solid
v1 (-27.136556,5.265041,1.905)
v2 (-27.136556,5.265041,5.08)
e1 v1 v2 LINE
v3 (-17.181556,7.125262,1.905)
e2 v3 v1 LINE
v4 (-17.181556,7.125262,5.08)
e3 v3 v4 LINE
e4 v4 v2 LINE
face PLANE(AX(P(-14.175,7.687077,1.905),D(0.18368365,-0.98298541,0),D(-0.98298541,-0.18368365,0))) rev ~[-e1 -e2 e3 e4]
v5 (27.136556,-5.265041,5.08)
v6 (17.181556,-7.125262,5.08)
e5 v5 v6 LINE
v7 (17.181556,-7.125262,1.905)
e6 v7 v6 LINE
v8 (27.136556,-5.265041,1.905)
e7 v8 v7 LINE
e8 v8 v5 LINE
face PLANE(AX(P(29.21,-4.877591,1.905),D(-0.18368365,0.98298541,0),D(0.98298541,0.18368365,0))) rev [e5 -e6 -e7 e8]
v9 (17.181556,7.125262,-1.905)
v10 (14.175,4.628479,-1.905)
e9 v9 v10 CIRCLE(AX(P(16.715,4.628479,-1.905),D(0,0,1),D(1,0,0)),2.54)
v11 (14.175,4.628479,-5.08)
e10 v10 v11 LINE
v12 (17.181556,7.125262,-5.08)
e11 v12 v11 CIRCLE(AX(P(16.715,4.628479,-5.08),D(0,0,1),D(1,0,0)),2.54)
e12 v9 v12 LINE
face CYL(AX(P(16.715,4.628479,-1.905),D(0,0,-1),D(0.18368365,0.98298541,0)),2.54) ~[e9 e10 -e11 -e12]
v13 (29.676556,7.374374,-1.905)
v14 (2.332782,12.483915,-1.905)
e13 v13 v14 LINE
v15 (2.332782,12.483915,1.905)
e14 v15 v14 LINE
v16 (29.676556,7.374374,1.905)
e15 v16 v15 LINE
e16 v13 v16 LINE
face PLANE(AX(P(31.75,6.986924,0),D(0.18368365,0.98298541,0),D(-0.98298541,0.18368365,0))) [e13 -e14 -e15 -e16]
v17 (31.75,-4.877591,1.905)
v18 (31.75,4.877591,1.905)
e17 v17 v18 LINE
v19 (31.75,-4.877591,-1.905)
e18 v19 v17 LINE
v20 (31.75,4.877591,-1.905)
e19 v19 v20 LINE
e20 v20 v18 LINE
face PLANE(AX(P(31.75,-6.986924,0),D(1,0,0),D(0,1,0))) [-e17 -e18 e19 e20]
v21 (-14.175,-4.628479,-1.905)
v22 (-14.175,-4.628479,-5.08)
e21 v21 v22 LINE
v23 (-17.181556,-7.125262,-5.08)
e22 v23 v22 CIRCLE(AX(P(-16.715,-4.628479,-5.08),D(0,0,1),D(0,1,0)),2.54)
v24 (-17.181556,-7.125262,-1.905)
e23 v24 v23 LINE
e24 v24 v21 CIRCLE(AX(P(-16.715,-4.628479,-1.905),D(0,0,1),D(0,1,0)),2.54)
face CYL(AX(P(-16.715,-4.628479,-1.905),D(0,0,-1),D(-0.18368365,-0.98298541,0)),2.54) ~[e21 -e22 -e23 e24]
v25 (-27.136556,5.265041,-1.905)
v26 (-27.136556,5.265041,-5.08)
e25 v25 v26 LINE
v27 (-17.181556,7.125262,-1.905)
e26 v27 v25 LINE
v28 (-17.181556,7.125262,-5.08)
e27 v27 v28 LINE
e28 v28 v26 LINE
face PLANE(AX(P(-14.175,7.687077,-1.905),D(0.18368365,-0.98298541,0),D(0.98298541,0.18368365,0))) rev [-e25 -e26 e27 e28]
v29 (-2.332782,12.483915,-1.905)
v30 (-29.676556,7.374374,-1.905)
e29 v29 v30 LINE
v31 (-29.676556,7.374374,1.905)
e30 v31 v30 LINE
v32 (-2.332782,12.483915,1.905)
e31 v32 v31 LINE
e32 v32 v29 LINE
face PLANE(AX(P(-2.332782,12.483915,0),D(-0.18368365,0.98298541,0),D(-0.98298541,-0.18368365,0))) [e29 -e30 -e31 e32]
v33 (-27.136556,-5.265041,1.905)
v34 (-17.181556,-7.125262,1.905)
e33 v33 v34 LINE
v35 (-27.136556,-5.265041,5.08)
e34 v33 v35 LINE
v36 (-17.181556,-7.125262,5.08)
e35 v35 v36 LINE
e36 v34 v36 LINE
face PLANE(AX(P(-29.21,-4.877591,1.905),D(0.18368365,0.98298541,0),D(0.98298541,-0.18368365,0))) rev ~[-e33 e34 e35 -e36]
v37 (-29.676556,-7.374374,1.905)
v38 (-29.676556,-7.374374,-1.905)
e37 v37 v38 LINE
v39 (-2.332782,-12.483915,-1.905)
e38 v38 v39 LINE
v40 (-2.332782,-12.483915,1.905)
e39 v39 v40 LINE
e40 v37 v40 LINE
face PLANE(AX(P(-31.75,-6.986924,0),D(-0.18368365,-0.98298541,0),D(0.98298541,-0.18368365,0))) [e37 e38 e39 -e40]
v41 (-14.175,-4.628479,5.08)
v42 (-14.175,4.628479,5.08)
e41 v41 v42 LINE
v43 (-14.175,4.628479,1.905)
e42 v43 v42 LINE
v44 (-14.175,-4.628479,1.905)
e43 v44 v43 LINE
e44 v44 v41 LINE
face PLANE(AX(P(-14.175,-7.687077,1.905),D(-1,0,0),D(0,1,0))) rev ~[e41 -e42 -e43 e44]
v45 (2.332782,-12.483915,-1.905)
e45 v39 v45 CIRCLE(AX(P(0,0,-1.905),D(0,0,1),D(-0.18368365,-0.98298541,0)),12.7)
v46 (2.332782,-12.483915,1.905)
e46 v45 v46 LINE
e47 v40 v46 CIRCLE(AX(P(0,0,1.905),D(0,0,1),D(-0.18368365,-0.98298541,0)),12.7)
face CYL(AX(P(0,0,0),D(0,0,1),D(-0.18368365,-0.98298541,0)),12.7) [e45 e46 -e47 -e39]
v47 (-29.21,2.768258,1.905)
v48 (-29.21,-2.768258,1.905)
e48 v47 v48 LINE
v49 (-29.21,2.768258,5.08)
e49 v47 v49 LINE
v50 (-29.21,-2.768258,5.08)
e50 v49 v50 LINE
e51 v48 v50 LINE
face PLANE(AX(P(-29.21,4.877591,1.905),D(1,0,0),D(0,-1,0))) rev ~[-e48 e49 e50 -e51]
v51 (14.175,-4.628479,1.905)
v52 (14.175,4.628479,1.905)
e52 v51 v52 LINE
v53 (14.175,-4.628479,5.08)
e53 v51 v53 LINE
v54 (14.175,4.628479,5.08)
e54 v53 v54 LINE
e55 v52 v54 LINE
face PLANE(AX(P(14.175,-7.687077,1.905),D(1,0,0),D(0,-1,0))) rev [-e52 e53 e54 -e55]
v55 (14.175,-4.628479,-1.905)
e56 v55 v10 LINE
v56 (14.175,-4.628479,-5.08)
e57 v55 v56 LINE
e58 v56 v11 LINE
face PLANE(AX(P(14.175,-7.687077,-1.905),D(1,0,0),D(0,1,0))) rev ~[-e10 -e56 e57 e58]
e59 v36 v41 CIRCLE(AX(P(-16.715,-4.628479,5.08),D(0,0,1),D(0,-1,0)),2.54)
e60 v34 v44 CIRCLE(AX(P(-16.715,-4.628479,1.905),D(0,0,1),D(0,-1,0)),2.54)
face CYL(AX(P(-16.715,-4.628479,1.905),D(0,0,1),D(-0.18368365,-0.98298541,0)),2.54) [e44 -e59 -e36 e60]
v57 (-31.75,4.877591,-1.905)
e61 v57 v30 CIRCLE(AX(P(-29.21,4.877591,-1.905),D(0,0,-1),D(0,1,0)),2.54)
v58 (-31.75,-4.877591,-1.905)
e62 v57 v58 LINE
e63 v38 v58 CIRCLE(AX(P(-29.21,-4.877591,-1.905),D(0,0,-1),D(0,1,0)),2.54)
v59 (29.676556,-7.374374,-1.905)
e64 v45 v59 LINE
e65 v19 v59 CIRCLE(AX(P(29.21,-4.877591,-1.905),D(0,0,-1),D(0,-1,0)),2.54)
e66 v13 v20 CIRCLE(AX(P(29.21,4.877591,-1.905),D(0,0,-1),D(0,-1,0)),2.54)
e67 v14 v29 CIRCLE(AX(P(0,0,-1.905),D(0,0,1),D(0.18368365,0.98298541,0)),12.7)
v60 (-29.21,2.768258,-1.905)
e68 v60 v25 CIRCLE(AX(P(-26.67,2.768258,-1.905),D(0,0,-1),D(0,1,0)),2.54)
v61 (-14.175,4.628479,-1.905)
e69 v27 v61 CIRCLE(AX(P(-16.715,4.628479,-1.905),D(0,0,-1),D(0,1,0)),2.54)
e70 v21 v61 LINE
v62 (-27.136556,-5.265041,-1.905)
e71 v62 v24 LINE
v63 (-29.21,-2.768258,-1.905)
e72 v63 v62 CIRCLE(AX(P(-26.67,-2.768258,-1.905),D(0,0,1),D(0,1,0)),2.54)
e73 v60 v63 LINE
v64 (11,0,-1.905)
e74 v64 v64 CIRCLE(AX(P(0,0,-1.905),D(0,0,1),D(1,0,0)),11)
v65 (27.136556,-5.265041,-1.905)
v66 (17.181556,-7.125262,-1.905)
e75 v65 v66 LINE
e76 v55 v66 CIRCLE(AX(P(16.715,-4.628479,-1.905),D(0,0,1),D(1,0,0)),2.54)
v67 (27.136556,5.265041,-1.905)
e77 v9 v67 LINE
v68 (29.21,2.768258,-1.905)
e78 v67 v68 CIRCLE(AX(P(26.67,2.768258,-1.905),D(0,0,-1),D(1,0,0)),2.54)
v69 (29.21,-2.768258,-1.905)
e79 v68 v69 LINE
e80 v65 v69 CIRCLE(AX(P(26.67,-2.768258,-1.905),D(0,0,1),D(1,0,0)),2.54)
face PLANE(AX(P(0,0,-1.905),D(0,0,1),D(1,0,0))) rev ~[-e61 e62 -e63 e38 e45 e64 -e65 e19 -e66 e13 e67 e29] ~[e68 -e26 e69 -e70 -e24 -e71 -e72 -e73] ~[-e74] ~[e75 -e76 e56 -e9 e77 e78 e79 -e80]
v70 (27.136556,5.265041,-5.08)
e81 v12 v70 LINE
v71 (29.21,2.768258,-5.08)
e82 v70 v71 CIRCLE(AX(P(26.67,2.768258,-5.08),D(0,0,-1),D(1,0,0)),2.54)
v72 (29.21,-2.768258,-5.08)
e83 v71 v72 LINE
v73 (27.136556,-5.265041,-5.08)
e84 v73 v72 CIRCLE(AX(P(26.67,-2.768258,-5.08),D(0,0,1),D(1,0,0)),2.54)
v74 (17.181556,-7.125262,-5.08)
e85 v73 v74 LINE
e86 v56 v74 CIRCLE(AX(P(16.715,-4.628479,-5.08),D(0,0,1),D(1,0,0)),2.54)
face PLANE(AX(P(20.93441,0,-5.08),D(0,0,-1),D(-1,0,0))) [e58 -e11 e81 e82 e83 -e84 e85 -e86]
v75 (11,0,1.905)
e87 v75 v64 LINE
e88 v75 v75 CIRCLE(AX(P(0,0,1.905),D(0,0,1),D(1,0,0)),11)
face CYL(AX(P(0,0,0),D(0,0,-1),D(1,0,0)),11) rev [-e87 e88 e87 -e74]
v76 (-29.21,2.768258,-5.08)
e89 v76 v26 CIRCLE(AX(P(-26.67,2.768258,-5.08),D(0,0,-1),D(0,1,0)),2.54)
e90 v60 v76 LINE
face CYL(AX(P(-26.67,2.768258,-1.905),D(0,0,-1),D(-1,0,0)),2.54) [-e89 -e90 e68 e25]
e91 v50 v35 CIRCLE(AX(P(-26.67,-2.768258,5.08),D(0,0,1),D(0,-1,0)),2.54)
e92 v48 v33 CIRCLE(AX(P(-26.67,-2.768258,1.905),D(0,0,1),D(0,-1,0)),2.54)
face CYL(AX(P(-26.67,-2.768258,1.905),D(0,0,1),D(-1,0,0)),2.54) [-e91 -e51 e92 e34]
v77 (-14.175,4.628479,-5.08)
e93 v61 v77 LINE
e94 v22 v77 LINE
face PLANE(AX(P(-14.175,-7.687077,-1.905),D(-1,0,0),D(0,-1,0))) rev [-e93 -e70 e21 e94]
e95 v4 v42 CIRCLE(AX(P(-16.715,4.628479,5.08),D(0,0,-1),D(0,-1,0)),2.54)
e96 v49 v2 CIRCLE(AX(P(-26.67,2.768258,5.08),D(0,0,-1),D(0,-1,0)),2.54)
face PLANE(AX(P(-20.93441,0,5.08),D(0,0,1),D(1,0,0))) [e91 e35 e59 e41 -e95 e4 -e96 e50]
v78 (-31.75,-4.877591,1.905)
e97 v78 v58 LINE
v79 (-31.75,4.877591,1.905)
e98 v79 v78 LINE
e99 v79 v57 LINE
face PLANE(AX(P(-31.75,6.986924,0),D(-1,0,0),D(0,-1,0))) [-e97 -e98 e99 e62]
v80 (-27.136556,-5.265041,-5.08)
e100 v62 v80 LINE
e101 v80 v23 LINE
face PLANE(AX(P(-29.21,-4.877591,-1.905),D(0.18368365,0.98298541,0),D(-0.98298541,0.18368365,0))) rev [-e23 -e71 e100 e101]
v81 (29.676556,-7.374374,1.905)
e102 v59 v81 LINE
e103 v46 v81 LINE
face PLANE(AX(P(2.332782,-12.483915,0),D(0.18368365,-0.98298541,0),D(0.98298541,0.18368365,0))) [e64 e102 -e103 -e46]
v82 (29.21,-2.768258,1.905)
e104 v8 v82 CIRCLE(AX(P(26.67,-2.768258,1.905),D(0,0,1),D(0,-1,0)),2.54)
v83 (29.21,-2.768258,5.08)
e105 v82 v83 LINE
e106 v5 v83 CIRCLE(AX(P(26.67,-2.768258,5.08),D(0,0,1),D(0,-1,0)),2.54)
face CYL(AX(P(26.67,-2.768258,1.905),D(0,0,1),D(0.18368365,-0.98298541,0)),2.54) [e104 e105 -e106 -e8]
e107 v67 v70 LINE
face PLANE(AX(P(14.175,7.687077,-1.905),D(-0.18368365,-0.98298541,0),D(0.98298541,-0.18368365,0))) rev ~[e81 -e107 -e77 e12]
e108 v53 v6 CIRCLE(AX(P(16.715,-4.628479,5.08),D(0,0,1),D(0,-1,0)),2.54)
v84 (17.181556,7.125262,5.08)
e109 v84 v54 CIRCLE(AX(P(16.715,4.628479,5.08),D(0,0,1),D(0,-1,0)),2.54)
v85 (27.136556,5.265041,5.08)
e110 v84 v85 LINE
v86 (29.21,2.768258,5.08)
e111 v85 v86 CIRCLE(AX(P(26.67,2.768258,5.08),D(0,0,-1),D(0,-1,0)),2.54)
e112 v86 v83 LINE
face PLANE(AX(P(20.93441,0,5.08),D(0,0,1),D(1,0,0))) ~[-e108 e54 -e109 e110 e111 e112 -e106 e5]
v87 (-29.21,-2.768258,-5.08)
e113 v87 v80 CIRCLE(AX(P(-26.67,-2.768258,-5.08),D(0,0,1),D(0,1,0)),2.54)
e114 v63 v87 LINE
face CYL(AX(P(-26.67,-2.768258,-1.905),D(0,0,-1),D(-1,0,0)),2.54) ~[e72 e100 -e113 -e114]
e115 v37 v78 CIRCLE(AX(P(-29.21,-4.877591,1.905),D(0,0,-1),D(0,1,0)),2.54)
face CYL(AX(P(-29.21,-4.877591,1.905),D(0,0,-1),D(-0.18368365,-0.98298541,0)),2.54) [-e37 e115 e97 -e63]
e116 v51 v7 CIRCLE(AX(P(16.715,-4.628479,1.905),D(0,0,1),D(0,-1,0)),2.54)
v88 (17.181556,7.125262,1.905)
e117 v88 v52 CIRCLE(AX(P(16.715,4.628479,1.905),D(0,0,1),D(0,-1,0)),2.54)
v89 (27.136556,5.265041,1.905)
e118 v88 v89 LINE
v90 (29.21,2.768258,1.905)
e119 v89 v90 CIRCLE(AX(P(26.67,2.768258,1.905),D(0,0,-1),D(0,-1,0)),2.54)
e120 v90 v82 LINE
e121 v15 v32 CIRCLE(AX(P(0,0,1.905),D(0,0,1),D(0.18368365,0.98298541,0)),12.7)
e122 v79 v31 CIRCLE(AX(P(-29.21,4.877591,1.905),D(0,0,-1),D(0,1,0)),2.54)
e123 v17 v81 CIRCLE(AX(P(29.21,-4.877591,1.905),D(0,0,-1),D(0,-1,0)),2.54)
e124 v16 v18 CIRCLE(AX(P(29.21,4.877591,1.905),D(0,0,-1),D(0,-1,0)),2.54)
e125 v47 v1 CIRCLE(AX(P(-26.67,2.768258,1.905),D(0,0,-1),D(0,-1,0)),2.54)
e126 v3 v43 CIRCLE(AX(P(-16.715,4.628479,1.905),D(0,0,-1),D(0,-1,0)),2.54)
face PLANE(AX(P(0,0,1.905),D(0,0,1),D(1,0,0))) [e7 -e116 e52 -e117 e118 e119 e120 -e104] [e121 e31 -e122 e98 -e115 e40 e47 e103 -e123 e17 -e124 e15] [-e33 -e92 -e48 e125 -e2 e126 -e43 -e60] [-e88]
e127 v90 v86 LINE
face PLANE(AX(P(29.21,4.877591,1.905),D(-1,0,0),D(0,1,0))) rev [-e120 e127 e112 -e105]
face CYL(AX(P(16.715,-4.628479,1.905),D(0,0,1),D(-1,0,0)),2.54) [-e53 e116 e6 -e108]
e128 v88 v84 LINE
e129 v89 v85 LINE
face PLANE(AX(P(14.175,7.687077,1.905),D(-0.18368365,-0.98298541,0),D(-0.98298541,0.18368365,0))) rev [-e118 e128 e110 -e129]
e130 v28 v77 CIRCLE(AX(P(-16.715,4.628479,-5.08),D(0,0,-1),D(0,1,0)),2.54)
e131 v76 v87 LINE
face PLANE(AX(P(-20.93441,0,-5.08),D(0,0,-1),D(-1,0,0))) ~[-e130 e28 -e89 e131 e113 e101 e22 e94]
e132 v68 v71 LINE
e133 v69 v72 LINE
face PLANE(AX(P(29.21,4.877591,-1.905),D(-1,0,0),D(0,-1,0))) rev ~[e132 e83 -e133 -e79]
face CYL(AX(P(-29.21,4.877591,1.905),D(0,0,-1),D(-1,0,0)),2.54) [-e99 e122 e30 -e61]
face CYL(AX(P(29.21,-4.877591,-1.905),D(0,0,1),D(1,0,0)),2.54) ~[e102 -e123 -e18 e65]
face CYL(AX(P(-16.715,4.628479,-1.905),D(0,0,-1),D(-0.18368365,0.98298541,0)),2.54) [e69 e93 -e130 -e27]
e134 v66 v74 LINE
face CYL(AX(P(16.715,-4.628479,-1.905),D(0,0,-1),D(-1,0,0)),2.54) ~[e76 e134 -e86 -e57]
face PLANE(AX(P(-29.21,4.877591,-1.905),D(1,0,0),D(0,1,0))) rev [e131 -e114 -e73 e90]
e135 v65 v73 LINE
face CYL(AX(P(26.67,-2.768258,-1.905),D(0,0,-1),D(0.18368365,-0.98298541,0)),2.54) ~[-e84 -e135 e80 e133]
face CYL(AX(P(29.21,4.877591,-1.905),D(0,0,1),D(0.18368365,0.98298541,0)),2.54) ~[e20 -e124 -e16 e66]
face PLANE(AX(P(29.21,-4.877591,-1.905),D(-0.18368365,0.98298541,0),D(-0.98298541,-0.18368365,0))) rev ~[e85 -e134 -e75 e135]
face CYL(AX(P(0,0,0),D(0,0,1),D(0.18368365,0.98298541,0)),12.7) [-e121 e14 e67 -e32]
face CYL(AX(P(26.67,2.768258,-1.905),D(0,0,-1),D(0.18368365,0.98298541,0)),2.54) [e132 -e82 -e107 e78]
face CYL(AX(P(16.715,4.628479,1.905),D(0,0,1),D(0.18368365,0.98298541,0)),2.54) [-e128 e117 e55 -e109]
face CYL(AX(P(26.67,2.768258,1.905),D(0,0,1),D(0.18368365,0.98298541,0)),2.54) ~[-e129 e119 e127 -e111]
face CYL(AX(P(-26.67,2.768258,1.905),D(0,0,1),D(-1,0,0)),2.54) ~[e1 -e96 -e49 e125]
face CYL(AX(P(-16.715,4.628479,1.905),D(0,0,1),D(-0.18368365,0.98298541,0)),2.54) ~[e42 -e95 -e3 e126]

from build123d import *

# Parameters (mm, degrees)
F0_R             = 11
F1_DEPTH         = 1.905
F3_R             = 2.54
F4_DEPTH         = 3.175
F4_COPIES2_COUNT = 2
F5_R             = 2.54


# Not quite as in the source:
# - a pattern or mirror of a feature is missing from the dataset's text; its kind, count and spacing are read off the source's solid


with BuildPart() as f1:
    # F0 (on Top) → F1 (new body, symmetric)
    with BuildSketch(Plane.XY):
        with BuildLine():
            Line((-31.75, -6.9869237544), (-2.3327823548, -12.4839147099))
            ThreePointArc((-2.3327823548, -12.4839147099), (0, -12.7), (2.3327823548, -12.4839147099))
            Line((2.3327823548, -12.4839147099), (31.75, -6.9869237544))
            Line((31.75, -6.9869237544), (31.75, 6.9869237544))
            Line((31.75, 6.9869237544), (2.3327823548, 12.4839147099))
            ThreePointArc((2.3327823548, 12.4839147099), (0, 12.7), (-2.3327823548, 12.4839147099))
            Line((-2.3327823548, 12.4839147099), (-31.75, 6.9869237544))
            Line((-31.75, 6.9869237544), (-31.75, -6.9869237544))
        make_face()
        Circle(F0_R, mode=Mode.SUBTRACT)
    extrude(amount=F1_DEPTH, both=True)

    # F3
    f3_edges = [f1.edges().sort_by_distance(p)[0] for p in [
        (-31.75, 6.986924, 0),
        (-31.75, -6.986924, 0),
        (31.75, -6.986924, 0),
        (31.75, 6.986924, 0),
    ]]
    fillet(f3_edges, radius=F3_R)

    # F2 (on face) → F4 (join)
    with BuildSketch(Plane.XY.offset(1.905)):
        Polygon((-29.21, 4.8775907903), (-29.21, -4.8775907903), (-14.175, -7.6870767183), (-14.175, 7.6870767183), align=None)
    f4 = extrude(amount=F4_DEPTH)

    # F4_copies: F4 across plane
    add(f4.mirror(Plane(origin=(0, 0, 0), x_dir=(0, 0, 1), z_dir=(1, 0, 0))))

    # F4_copies1: F4 across plane
    add(f4.mirror(Plane(origin=(0, 0, 0), x_dir=(-1, 0, 0), z_dir=(0, 0, -1))))

    # F4_copies2: F4 ×2 about axis
    f4_copies2_axis = Axis((0, 0, 0), (0, 1, 0))
    for i in range(1, F4_COPIES2_COUNT):
        add(f4.rotate(f4_copies2_axis, i * 360 / F4_COPIES2_COUNT))

    # F5
    f5_edges = [f1.edges().sort_by_distance(p)[0] for p in [
        (-29.21, -4.877591, 3.4925),
        (-14.175, -7.687077, 3.4925),
        (-14.175, 7.687077, 3.4925),
        (-29.21, 4.877591, 3.4925),
        (-14.175, -7.687077, -3.4925),
        (-14.175, 7.687077, -3.4925),
        (-29.21, -4.877591, -3.4925),
        (-29.21, 4.877591, -3.4925),
        (29.21, -4.877591, -3.4925),
        (14.175, -7.687077, -3.4925),
        (29.21, 4.877591, -3.4925),
        (14.175, 7.687077, -3.4925),
        (29.21, -4.877591, 3.4925),
        (14.175, -7.687077, 3.4925),
        (29.21, 4.877591, 3.4925),
        (14.175, 7.687077, 3.4925),
    ]]
    fillet(f5_edges, radius=F5_R)


solid = f1.part
